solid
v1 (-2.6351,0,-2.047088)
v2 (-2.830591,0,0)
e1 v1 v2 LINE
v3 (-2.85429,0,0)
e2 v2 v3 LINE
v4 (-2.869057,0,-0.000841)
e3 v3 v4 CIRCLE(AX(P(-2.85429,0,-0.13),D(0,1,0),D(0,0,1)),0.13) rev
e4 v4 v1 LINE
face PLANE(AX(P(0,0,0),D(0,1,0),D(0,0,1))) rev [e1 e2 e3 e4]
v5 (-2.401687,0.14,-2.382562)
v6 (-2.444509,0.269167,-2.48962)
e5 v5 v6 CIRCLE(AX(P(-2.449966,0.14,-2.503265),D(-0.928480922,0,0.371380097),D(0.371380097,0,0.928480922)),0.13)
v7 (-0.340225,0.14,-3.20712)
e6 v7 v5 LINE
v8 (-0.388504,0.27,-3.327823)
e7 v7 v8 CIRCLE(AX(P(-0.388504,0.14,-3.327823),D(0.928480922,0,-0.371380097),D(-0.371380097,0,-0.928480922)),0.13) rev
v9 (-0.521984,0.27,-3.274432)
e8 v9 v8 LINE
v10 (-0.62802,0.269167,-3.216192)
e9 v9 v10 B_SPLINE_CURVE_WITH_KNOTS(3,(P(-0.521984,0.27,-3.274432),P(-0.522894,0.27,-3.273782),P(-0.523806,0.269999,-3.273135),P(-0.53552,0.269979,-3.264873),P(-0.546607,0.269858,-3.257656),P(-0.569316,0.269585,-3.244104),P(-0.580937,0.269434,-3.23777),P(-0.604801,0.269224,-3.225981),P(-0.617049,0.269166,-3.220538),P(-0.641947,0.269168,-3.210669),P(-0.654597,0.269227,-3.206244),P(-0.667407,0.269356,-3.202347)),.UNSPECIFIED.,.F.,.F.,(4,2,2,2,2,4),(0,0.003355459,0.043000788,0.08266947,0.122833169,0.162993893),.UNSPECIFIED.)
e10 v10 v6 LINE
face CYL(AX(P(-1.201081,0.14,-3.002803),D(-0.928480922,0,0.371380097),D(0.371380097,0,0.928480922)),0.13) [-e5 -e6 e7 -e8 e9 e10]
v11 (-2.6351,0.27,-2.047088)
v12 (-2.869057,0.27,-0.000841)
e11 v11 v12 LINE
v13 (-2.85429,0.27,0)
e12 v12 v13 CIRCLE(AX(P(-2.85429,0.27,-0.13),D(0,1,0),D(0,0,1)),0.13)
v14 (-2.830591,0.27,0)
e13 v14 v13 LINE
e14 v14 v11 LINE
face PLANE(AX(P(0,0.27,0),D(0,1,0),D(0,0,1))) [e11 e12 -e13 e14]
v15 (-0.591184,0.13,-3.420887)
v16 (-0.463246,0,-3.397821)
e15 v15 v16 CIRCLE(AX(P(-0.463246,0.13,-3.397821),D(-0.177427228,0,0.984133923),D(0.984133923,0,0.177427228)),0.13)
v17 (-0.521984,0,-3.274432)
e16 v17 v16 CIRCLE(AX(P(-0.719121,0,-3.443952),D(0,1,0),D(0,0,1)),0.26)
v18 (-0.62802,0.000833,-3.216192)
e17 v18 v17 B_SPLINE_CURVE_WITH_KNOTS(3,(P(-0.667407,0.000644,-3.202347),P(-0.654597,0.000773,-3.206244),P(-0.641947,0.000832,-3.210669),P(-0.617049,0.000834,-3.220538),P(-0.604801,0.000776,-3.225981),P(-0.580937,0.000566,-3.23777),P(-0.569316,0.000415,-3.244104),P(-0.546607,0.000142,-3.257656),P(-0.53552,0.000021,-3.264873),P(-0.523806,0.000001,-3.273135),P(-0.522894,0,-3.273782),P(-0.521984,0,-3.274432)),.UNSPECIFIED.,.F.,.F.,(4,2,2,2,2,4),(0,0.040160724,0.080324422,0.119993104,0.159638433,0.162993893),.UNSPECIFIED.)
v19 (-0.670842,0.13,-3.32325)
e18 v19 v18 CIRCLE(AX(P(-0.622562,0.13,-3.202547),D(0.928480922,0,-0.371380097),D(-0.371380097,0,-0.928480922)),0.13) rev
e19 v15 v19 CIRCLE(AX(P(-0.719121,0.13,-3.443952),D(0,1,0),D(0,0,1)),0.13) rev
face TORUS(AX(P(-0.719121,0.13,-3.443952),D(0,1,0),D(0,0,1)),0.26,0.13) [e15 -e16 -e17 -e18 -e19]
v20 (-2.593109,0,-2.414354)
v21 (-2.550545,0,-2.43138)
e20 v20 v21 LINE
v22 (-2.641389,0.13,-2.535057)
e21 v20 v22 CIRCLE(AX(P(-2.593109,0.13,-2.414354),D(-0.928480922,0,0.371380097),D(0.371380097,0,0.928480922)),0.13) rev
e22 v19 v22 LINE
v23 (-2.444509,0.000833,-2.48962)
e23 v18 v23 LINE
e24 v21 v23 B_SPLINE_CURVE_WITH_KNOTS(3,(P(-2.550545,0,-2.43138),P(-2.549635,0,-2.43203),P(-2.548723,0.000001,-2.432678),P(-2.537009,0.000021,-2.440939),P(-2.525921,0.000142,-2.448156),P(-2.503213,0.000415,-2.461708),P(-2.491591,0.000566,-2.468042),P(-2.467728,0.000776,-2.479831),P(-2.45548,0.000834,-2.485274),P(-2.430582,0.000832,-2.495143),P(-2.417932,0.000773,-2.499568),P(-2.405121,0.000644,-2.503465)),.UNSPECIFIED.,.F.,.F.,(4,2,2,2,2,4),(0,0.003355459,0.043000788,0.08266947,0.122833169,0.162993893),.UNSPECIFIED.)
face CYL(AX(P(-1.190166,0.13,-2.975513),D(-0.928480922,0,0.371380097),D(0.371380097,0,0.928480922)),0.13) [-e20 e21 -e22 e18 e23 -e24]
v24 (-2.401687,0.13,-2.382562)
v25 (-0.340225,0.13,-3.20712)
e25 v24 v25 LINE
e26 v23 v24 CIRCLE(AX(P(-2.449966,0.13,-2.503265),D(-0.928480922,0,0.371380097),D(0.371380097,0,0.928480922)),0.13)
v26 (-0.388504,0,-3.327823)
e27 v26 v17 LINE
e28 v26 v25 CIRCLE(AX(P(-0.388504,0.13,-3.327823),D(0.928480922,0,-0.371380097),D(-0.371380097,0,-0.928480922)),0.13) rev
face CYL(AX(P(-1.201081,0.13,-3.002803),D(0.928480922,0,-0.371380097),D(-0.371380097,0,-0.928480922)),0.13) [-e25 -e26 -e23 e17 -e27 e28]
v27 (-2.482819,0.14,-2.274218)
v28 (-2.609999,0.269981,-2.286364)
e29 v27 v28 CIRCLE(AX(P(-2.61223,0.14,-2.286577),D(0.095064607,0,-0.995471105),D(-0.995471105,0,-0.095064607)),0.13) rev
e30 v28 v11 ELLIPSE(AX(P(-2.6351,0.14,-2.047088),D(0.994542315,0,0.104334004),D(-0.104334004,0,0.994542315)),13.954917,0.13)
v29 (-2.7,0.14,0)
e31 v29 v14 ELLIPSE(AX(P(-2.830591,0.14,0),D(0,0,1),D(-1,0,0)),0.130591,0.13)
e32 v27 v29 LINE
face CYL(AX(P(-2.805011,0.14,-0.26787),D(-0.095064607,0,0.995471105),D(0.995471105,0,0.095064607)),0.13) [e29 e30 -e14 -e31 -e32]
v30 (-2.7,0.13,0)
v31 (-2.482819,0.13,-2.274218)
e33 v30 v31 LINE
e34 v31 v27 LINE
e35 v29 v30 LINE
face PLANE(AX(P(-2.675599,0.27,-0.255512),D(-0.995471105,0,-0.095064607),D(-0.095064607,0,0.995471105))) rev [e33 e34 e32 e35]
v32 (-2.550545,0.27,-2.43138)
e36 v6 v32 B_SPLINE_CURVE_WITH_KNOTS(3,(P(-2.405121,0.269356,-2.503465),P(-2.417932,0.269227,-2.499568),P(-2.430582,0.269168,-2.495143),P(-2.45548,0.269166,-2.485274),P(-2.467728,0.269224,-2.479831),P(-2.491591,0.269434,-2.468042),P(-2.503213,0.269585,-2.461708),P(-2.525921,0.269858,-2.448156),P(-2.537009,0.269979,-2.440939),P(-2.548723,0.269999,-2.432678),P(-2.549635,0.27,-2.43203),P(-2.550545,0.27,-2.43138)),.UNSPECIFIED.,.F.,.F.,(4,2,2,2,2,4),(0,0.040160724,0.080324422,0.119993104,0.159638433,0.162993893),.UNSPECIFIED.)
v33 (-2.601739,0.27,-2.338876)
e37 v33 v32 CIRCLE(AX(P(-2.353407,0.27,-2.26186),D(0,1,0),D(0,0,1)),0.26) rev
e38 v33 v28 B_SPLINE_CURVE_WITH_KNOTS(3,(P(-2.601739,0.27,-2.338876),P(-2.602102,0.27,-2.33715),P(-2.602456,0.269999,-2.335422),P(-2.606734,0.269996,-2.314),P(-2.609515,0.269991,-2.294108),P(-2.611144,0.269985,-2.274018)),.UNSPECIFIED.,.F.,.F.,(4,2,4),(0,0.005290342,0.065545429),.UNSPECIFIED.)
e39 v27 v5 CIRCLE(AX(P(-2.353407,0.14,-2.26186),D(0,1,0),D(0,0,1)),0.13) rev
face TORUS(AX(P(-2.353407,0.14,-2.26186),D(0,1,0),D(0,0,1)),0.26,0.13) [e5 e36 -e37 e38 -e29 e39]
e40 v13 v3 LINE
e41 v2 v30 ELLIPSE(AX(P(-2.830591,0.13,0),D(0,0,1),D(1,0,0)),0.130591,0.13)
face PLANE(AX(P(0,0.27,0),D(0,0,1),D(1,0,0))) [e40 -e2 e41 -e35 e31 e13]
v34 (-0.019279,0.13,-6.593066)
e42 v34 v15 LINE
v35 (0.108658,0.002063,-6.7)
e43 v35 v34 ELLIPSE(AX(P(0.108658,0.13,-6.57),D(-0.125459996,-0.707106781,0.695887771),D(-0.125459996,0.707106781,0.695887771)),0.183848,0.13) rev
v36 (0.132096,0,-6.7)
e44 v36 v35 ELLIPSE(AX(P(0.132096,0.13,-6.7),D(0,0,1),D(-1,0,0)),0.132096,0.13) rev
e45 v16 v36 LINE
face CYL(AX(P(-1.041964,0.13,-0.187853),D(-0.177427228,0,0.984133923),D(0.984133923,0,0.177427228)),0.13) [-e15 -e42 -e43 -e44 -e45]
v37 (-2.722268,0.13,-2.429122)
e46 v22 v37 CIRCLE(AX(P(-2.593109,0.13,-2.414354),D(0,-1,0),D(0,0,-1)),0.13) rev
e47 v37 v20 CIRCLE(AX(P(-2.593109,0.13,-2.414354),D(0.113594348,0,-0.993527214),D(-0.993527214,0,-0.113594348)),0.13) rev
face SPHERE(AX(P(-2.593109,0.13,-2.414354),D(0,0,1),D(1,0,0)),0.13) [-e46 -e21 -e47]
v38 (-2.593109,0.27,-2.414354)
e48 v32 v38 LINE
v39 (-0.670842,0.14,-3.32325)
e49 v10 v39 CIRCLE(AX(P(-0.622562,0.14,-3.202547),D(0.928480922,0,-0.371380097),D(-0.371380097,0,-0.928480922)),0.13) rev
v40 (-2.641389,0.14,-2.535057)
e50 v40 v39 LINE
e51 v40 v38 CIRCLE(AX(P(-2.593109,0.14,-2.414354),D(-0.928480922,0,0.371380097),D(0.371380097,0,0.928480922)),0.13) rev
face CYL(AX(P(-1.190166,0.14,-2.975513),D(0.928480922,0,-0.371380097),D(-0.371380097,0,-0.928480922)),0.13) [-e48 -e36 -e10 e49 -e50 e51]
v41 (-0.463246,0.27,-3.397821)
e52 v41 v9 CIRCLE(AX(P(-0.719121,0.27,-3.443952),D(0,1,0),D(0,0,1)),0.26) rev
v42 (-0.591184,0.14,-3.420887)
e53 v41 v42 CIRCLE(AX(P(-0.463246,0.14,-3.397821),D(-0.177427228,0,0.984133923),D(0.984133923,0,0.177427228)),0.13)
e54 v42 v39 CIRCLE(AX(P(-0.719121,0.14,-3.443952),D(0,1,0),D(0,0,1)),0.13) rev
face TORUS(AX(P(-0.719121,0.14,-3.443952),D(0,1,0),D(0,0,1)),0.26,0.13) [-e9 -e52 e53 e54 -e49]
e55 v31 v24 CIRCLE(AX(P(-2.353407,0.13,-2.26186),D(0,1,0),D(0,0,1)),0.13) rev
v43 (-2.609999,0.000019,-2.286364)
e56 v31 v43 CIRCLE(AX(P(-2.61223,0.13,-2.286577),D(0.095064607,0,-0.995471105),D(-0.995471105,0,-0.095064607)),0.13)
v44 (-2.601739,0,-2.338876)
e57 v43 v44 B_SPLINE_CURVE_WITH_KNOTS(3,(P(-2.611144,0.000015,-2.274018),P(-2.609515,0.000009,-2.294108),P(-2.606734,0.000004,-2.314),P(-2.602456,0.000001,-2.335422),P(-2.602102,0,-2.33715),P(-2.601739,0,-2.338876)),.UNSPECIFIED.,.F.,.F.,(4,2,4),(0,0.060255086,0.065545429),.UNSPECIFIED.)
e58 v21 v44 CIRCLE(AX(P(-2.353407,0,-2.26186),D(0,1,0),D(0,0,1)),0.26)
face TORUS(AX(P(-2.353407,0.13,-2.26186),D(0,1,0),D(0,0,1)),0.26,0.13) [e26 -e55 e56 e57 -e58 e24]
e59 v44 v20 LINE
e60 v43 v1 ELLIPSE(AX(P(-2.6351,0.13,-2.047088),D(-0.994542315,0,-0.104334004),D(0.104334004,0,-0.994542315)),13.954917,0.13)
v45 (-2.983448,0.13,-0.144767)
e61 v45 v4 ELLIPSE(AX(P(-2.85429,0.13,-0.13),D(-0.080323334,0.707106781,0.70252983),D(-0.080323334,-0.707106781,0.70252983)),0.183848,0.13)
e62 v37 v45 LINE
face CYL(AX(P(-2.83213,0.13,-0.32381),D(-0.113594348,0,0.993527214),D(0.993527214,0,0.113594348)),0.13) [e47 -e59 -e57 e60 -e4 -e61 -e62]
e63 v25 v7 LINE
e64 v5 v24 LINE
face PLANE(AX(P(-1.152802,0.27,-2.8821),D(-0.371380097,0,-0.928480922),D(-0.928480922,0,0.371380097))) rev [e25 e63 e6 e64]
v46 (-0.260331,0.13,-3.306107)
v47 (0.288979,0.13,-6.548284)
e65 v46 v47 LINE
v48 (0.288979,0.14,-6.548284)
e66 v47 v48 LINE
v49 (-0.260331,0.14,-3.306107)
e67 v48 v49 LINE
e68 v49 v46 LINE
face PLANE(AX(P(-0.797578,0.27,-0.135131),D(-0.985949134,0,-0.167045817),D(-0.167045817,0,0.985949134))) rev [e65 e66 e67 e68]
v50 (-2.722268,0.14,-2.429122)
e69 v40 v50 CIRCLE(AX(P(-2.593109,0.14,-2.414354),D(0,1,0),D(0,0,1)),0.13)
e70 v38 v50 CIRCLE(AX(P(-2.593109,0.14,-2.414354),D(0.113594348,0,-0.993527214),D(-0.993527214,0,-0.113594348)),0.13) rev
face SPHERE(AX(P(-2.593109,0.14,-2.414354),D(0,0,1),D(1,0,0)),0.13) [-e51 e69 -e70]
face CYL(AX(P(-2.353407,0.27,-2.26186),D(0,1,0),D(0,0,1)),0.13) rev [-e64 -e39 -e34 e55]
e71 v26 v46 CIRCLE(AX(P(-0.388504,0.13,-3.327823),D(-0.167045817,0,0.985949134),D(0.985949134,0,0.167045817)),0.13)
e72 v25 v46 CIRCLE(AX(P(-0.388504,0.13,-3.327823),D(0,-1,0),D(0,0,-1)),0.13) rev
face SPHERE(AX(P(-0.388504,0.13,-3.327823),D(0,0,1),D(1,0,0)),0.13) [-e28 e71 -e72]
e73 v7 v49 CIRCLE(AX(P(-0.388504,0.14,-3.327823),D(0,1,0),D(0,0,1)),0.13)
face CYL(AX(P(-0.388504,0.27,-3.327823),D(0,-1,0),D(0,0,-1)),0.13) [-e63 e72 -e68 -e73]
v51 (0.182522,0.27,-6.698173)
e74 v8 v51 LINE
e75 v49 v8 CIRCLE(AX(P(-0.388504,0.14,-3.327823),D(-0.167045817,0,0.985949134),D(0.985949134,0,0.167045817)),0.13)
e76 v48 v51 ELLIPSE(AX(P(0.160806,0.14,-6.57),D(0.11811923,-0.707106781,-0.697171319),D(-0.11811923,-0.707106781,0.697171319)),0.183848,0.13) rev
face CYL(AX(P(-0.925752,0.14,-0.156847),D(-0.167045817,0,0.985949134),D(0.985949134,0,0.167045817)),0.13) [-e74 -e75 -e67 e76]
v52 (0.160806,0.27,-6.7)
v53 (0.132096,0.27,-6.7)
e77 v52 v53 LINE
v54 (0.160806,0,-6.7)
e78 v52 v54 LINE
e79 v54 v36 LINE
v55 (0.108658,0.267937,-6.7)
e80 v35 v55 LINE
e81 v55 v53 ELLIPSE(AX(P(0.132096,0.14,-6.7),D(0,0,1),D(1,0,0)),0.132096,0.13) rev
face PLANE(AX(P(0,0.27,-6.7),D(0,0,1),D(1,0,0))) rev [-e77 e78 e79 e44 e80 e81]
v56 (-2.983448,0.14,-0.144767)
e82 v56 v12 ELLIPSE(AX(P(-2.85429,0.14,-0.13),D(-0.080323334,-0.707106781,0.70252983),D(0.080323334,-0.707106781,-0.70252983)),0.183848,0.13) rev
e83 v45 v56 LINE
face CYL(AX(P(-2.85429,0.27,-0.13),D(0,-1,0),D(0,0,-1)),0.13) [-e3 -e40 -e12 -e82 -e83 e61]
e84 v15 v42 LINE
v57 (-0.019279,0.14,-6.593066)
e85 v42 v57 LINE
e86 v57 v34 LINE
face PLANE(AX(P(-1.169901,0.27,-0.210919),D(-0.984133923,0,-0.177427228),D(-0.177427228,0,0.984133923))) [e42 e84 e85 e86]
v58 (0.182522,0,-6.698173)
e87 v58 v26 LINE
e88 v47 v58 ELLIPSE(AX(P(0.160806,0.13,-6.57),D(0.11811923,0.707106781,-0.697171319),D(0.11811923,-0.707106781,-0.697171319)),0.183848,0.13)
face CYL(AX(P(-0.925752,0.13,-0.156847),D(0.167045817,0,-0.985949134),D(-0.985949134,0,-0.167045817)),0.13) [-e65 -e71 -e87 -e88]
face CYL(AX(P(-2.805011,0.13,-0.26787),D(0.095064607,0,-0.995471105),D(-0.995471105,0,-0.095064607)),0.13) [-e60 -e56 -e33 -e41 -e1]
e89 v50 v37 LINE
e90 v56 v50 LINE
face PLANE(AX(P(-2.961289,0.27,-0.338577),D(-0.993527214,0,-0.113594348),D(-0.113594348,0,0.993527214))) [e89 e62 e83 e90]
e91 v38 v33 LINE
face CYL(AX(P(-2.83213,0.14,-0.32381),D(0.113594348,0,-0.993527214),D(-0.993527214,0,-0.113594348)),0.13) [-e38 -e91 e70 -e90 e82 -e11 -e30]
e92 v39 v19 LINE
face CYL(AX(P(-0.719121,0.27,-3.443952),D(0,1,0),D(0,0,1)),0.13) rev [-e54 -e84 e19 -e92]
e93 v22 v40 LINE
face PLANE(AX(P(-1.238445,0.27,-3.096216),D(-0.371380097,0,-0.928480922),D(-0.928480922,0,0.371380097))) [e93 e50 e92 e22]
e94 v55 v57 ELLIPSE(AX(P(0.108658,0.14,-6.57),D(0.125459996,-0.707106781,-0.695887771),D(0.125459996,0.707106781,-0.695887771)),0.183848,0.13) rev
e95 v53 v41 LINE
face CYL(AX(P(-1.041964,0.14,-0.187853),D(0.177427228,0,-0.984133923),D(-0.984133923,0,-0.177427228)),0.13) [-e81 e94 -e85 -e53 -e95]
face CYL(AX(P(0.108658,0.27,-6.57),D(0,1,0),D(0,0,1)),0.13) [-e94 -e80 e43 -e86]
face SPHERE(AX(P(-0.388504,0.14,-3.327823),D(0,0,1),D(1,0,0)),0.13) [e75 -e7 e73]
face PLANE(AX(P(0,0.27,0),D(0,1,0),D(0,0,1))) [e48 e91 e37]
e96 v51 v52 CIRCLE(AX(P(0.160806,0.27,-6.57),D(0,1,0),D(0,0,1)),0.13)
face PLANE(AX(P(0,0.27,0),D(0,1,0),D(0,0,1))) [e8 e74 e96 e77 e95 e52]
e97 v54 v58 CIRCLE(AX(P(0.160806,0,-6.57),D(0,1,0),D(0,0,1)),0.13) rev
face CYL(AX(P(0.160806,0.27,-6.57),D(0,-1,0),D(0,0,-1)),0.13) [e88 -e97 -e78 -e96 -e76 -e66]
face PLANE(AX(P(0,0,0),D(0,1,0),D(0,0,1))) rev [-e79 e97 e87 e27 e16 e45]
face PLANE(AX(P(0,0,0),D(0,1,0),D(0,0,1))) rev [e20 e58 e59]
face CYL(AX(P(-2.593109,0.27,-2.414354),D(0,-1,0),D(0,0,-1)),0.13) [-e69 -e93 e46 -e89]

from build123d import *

# Parameters (mm, degrees)
RESSALTO_EXTRUS_O1_DEPTH = 0.27
FILETE2_R                = 0.13


with BuildPart() as part:
    # Esboço1 → Ressalto-extrusão1 (new body)
    with BuildSketch(Plane(origin=(0, 0, 0), x_dir=(1, 0, 0), z_dir=(0, 1, 0))):
        Polygon((-0.272513318, 3.234203787), (0.314684076, 6.7), (0.021085379, 6.7), (0, 6.7), (-0.603963749, 3.35), (-2.713451347, 2.506232841), (-3, 0), (-2.7, 0), (-2.475283392, 2.353124871), (-0.518320279, 3.135884251), align=None)
    extrude(amount=RESSALTO_EXTRUS_O1_DEPTH)

    # Filete2
    # the kernel refuses this fillet: 0.13 mm, written as the material it adds along each edge
    with BuildSketch(Plane(origin=(-2.475283392, 0, -2.353124871), x_dir=(-0.0950646065596586, 0, 0.9954711048441623), z_dir=(0, 1, 0))) as filete2_piece_1:
        with BuildLine():
            CenterArc((FILETE2_R * 0.609734486381, FILETE2_R), FILETE2_R, 207.255794996, 62.744205004)
            Line((-FILETE2_R * 0.279236340383, FILETE2_R * 0.542036170465), (0, 0))
            Line((0, 0), (FILETE2_R * 0.609734486381, 0))
        make_face()
    extrude(amount=0.27)
    with BuildSketch(Plane(origin=(-0.603963749, 0, -3.35), x_dir=(-0.9284809223662713, 0, 0.37138009747680073), z_dir=(0, 1, 0))) as filete2_piece_2:
        with BuildLine():
            CenterArc((FILETE2_R * 0.554072981115, -FILETE2_R), FILETE2_R, 90, 57.979304495)
            Line((-FILETE2_R * 0.293783650389, -FILETE2_R * 0.469774451376), (0, 0))
            Line((0, 0), (FILETE2_R * 0.554072981115, 0))
        make_face()
    extrude(amount=0.27)
    # the kernel refuses this fillet: 0.13 mm, written as the material it takes off along each edge
    with BuildSketch(Plane(origin=(-2.593109265, 0.13, -2.414354436), x_dir=(-0.3713800974768016, 0, -0.9284809223662711), z_dir=(0, -1, 0))) as filete2_2_piece_1_section:
        Polygon((0, 0), (FILETE2_R, 0), (FILETE2_R, -FILETE2_R * 0.597027041994), (FILETE2_R * 0.474446418292, -FILETE2_R * 0.880284383691), align=None)
    filete2_2_piece_1 = extrude(amount=FILETE2_R, mode=Mode.PRIVATE)
    filete2_2_piece_1 = filete2_2_piece_1 - Plane(origin=(-2.593109265, 0.13, -2.414354436), x_dir=(0.7948289276830398, 0, 0.6068335650886731), z_dir=(0, -1, 0)) * Sphere(FILETE2_R, mode=Mode.PRIVATE)
    add(filete2_2_piece_1, mode=Mode.SUBTRACT)
    with BuildSketch(Plane(origin=(-0.388504479, 0.13, -3.327822502), x_dir=(0.9859491340163403, 0, 0.16704581746463637), z_dir=(0, -1, 0))) as filete2_2_piece_2_section:
        Polygon((0, 0), (FILETE2_R, 0), (FILETE2_R, FILETE2_R * 0.560980407137), (FILETE2_R * 0.521260740175, FILETE2_R * 0.853397469385), align=None)
    filete2_2_piece_2 = extrude(amount=FILETE2_R, mode=Mode.PRIVATE)
    filete2_2_piece_2 = filete2_2_piece_2 - Plane(origin=(-0.388504479, 0.13, -3.327822502), x_dir=(-0.7781590553418893, 0, -0.6280672611985266), z_dir=(0, -1, 0)) * Sphere(FILETE2_R, mode=Mode.PRIVATE)
    add(filete2_2_piece_2, mode=Mode.SUBTRACT)
    with BuildSketch(Plane(origin=(-0.388504479, 0.14, -3.327822502), x_dir=(0.9859491340163403, 0, 0.16704581746463637), z_dir=(0, 1, 0))) as filete2_2_piece_3_section:
        Polygon((0, 0), (FILETE2_R, 0), (FILETE2_R, -FILETE2_R * 0.560980407137), (FILETE2_R * 0.521260740175, -FILETE2_R * 0.853397469385), align=None)
    filete2_2_piece_3 = extrude(amount=FILETE2_R, mode=Mode.PRIVATE)
    filete2_2_piece_3 = filete2_2_piece_3 - Plane(origin=(-0.388504479, 0.14, -3.327822502), x_dir=(-0.7781590553418893, 0, -0.6280672611985266), z_dir=(0, 1, 0)) * Sphere(FILETE2_R, mode=Mode.PRIVATE)
    add(filete2_2_piece_3, mode=Mode.SUBTRACT)
    with BuildSketch(Plane(origin=(-2.593109265, 0.14, -2.414354436), x_dir=(-0.3713800974768016, 0, -0.9284809223662711), z_dir=(0, 1, 0))) as filete2_2_piece_4_section:
        Polygon((0, 0), (FILETE2_R, 0), (FILETE2_R, FILETE2_R * 0.597027041994), (FILETE2_R * 0.474446418292, FILETE2_R * 0.880284383691), align=None)
    filete2_2_piece_4 = extrude(amount=FILETE2_R, mode=Mode.PRIVATE)
    filete2_2_piece_4 = filete2_2_piece_4 - Plane(origin=(-2.593109265, 0.14, -2.414354436), x_dir=(0.7948289276830398, 0, 0.6068335650886731), z_dir=(0, 1, 0)) * Sphere(FILETE2_R, mode=Mode.PRIVATE)
    add(filete2_2_piece_4, mode=Mode.SUBTRACT)
    with BuildSketch(Plane(origin=(-2.722267803, 0, -2.429121702), x_dir=(0.9935272135866853, 0, 0.11359434784652435), z_dir=(-0.11359434784652435, 0, 0.9935272135866853))) as filete2_2_piece_5:
        with BuildLine():
            CenterArc((FILETE2_R, FILETE2_R), FILETE2_R, 180, 90)
            Line((0, FILETE2_R), (0, 0))
            Line((0, 0), (FILETE2_R, 0))
        make_face()
    extrude(amount=2.769947324, mode=Mode.SUBTRACT)
    with BuildSketch(Plane(origin=(-0.670841754, 0, -3.323249682), x_dir=(0.3713800974768015, 0, 0.9284809223662709), z_dir=(-0.9284809223662711, 0, 0.3713800974768016))) as filete2_2_piece_6:
        with BuildLine():
            CenterArc((FILETE2_R, FILETE2_R), FILETE2_R, 180, 90)
            Line((0, FILETE2_R), (0, 0))
            Line((0, 0), (FILETE2_R, 0))
        make_face()
    extrude(amount=2.122334317, mode=Mode.SUBTRACT)
    with BuildSketch(Plane(origin=(0.057663849, 0, -7.019843525), x_dir=(0.9841339231865321, 0, 0.17742722799357663), z_dir=(-0.17742722799357666, 0, 0.9841339231865323))) as filete2_2_piece_7:
        with BuildLine():
            CenterArc((FILETE2_R, FILETE2_R), FILETE2_R, 180, 90)
            Line((0, FILETE2_R), (0, 0))
            Line((0, 0), (FILETE2_R, 0))
        make_face()
    extrude(amount=3.656978769, mode=Mode.SUBTRACT)
    with BuildSketch(Plane(origin=(-0.260331092, 0, -3.306106546), x_dir=(0, 1, 0), z_dir=(0.16704581746463637, 0, -0.9859491340163403))) as filete2_2_piece_8:
        with BuildLine():
            CenterArc((FILETE2_R, -FILETE2_R), FILETE2_R, 90, 90)
            Line((0, -FILETE2_R), (0, 0))
            Line((0, 0), (FILETE2_R, 0))
        make_face()
    extrude(amount=3.767260191, mode=Mode.SUBTRACT)
    with BuildSketch(Plane(origin=(0.057663849, 0.27, -7.019843525), x_dir=(0.9841339231865321, 0, 0.17742722799357663), z_dir=(-0.17742722799357666, 0, 0.9841339231865323))) as filete2_2_piece_9:
        with BuildLine():
            CenterArc((FILETE2_R, -FILETE2_R), FILETE2_R, 90, 90)
            Line((0, -FILETE2_R), (0, 0))
            Line((0, 0), (FILETE2_R, 0))
        make_face()
    extrude(amount=3.656978769, mode=Mode.SUBTRACT)
    with BuildSketch(Plane(origin=(-0.272513318, 0.13, -3.234203787), x_dir=(0.16704581746463568, 0, -0.9859491340163404), z_dir=(0, 1, 0))) as filete2_2_piece_10:
        with BuildLine():
            CenterArc((FILETE2_R * 0.560980407137, FILETE2_R), FILETE2_R, 211.416857509, 58.583142491)
            Line((-FILETE2_R * 0.292417062248, FILETE2_R * 0.478739259825), (0, 0))
            Line((0, 0), (FILETE2_R * 0.560980407137, 0))
        make_face()
    extrude(amount=0.01, mode=Mode.SUBTRACT)
    with BuildSketch(Plane(origin=(-3, -0.364276044, 0), x_dir=(0.11359434784652375, 0, -0.9935272135866854), z_dir=(0, 1, 0))) as filete2_2_piece_11:
        with BuildLine():
            CenterArc((FILETE2_R * 1.1208493664, -FILETE2_R), FILETE2_R, 90, 96.522555827)
            Line((FILETE2_R * 0.12732215281, -FILETE2_R * 1.11359434785), (0, 0))
            Line((0, 0), (FILETE2_R * 1.1208493664, 0))
        make_face()
    extrude(amount=0.998552088, mode=Mode.SUBTRACT)
    with BuildSketch(Plane(origin=(-2.713451347, 0.13, -2.506232841), x_dir=(0.9284809223662704, 0, -0.3713800974768032), z_dir=(0, 1, 0))) as filete2_2_piece_12:
        with BuildLine():
            CenterArc((FILETE2_R * 0.597027041994, -FILETE2_R), FILETE2_R, 90, 61.676687502)
            Line((-FILETE2_R * 0.283257341697, -FILETE2_R * 0.525553581708), (0, 0))
            Line((0, 0), (FILETE2_R * 0.597027041994, 0))
        make_face()
    extrude(amount=0.01, mode=Mode.SUBTRACT)
    with BuildSketch(Plane(origin=(0, -0.271646109, -6.7), x_dir=(1, 0, 0), z_dir=(0, 1, 0))) as filete2_2_piece_13:
        with BuildLine():
            CenterArc((FILETE2_R * 0.835834181331, -FILETE2_R), FILETE2_R, 90, 79.780061166)
            Line((-FILETE2_R * 0.148299741856, -FILETE2_R * 0.822572772006), (0, 0))
            Line((0, 0), (FILETE2_R * 0.835834181331, 0))
        make_face()
    extrude(amount=0.813292218, mode=Mode.SUBTRACT)
    with BuildSketch(Plane(origin=(0.314684076, -0.384695191, -6.7), x_dir=(-0.16704581746463687, 0, 0.9859491340163402), z_dir=(0, 1, 0))) as filete2_2_piece_14:
        with BuildLine():
            CenterArc((FILETE2_R * 1.18367751155, -FILETE2_R), FILETE2_R, 90, 99.616100838)
            Line((FILETE2_R * 0.197728377531, -FILETE2_R * 1.16704581746), (0, 0))
            Line((0, 0), (FILETE2_R * 1.18367751155, 0))
        make_face()
    extrude(amount=1.039390383, mode=Mode.SUBTRACT)
    with BuildSketch(Plane(origin=(-0.670841754, 0.27, -3.323249682), x_dir=(0.3713800974768015, 0, 0.9284809223662709), z_dir=(-0.9284809223662711, 0, 0.3713800974768016))) as filete2_2_piece_15:
        with BuildLine():
            CenterArc((FILETE2_R, -FILETE2_R), FILETE2_R, 90, 90)
            Line((0, -FILETE2_R), (0, 0))
            Line((0, 0), (FILETE2_R, 0))
        make_face()
    extrude(amount=2.122334317, mode=Mode.SUBTRACT)
    with BuildSketch(Plane(origin=(-2.722267803, 0.27, -2.429121702), x_dir=(0.9935272135866853, 0, 0.11359434784652435), z_dir=(-0.11359434784652435, 0, 0.9935272135866853))) as filete2_2_piece_16:
        with BuildLine():
            CenterArc((FILETE2_R, -FILETE2_R), FILETE2_R, 90, 90)
            Line((0, -FILETE2_R), (0, 0))
            Line((0, 0), (FILETE2_R, 0))
        make_face()
    extrude(amount=2.769947324, mode=Mode.SUBTRACT)
    with BuildSketch(Plane(origin=(-2.730895997, 0.27, 0.323528109), x_dir=(-0.9954711048441621, 0, -0.09506460655966084), z_dir=(0.09506460655966086, 0, -0.9954711048441622))) as filete2_2_piece_17:
        with BuildLine():
            CenterArc((FILETE2_R, -FILETE2_R), FILETE2_R, 90, 90)
            Line((0, -FILETE2_R), (0, 0))
            Line((0, 0), (FILETE2_R, 0))
        make_face()
    extrude(amount=2.609564928, mode=Mode.SUBTRACT)
    with BuildSketch(Plane(origin=(-0.340225066, 0.27, -3.207119982), x_dir=(0, -1, 0), z_dir=(-0.928480922366271, 0, 0.37138009747680173)), Plane(origin=(-2.401686903, 0, -2.382562494), x_dir=(0, 1, 0), z_dir=(0.928480922366271, 0, -0.37138009747680173))) as filete2_2_piece_18:
        with BuildLine():
            CenterArc((FILETE2_R, -FILETE2_R), FILETE2_R, 90, 90)
            Line((0, -FILETE2_R), (0, 0))
            Line((0, 0), (FILETE2_R, 0))
        make_face()
    extrude(amount=2.220252228, mode=Mode.SUBTRACT)
    with BuildSketch(Plane(origin=(-0.260331092, 0.27, -3.306106546), x_dir=(0, -1, 0), z_dir=(0.16704581746463637, 0, -0.9859491340163403))) as filete2_2_piece_19:
        with BuildLine():
            CenterArc((FILETE2_R, FILETE2_R), FILETE2_R, 180, 90)
            Line((0, FILETE2_R), (0, 0))
            Line((0, 0), (FILETE2_R, 0))
        make_face()
    extrude(amount=3.767260191, mode=Mode.SUBTRACT)
    with BuildSketch(Plane(origin=(-2.730895997, 0, 0.323528109), x_dir=(-0.9954711048441621, 0, -0.09506460655966084), z_dir=(0.09506460655966086, 0, -0.9954711048441622))) as filete2_2_piece_20:
        with BuildLine():
            CenterArc((FILETE2_R, FILETE2_R), FILETE2_R, 180, 90)
            Line((0, FILETE2_R), (0, 0))
            Line((0, 0), (FILETE2_R, 0))
        make_face()
    extrude(amount=2.609564928, mode=Mode.SUBTRACT)
    with BuildSketch(Plane(origin=(-2.35340749, 0, -2.261859974), x_dir=(-0.9954711048441621, 0, -0.09506460655966179), z_dir=(-0.09506460655966179, 0, 0.9954711048441621))) as filete2_2_piece_21:
        with BuildLine():
            CenterArc((0.13 + FILETE2_R, -FILETE2_R), FILETE2_R, 90, 90)
            Line((0.13, -FILETE2_R), (0.13, 0))
            Line((0.13, 0), (0.13 + FILETE2_R, 0))
        make_face()
    revolve(axis=Axis((-2.35340749, 0, -2.261859974), (0, -1, 0)), revolution_arc=62.744205004, mode=Mode.SUBTRACT)
    with BuildSketch(Plane(origin=(-2.35340749, 0.27, -2.261859974), x_dir=(-0.9954711048441621, 0, -0.09506460655966179), z_dir=(-0.09506460655966179, 0, 0.9954711048441621))) as filete2_2_piece_22:
        with BuildLine():
            CenterArc((0.13 + FILETE2_R, FILETE2_R), FILETE2_R, 180, 90)
            Line((0.13, FILETE2_R), (0.13, 0))
            Line((0.13, 0), (0.13 + FILETE2_R, 0))
        make_face()
    revolve(axis=Axis((-2.35340749, 0.27, -2.261859974), (0, -1, 0)), revolution_arc=62.744205004, mode=Mode.SUBTRACT)
    with BuildSketch(Plane(origin=(-0.719121167, 0.27, -3.443952202), x_dir=(0.37138009747680156, 0, 0.9284809223662711), z_dir=(-0.9284809223662711, 0, 0.37138009747680156))) as filete2_2_piece_23:
        with BuildLine():
            CenterArc((0.13 + FILETE2_R, -FILETE2_R), FILETE2_R, 90, 90)
            Line((0.13, -FILETE2_R), (0.13, 0))
            Line((0.13, 0), (0.13 + FILETE2_R, 0))
        make_face()
    revolve(axis=Axis((-0.719121167, 0.27, -3.443952202), (0, 1, 0)), revolution_arc=57.979304495, mode=Mode.SUBTRACT)
    with BuildSketch(Plane(origin=(-0.719121167, 0, -3.443952202), x_dir=(0.37138009747680156, 0, 0.9284809223662711), z_dir=(-0.9284809223662711, 0, 0.37138009747680156))) as filete2_2_piece_24:
        with BuildLine():
            CenterArc((0.13 + FILETE2_R, FILETE2_R), FILETE2_R, 180, 90)
            Line((0.13, FILETE2_R), (0.13, 0))
            Line((0.13, 0), (0.13 + FILETE2_R, 0))
        make_face()
    revolve(axis=Axis((-0.719121167, 0, -3.443952202), (0, 1, 0)), revolution_arc=57.979304495, mode=Mode.SUBTRACT)


solid = part.part
